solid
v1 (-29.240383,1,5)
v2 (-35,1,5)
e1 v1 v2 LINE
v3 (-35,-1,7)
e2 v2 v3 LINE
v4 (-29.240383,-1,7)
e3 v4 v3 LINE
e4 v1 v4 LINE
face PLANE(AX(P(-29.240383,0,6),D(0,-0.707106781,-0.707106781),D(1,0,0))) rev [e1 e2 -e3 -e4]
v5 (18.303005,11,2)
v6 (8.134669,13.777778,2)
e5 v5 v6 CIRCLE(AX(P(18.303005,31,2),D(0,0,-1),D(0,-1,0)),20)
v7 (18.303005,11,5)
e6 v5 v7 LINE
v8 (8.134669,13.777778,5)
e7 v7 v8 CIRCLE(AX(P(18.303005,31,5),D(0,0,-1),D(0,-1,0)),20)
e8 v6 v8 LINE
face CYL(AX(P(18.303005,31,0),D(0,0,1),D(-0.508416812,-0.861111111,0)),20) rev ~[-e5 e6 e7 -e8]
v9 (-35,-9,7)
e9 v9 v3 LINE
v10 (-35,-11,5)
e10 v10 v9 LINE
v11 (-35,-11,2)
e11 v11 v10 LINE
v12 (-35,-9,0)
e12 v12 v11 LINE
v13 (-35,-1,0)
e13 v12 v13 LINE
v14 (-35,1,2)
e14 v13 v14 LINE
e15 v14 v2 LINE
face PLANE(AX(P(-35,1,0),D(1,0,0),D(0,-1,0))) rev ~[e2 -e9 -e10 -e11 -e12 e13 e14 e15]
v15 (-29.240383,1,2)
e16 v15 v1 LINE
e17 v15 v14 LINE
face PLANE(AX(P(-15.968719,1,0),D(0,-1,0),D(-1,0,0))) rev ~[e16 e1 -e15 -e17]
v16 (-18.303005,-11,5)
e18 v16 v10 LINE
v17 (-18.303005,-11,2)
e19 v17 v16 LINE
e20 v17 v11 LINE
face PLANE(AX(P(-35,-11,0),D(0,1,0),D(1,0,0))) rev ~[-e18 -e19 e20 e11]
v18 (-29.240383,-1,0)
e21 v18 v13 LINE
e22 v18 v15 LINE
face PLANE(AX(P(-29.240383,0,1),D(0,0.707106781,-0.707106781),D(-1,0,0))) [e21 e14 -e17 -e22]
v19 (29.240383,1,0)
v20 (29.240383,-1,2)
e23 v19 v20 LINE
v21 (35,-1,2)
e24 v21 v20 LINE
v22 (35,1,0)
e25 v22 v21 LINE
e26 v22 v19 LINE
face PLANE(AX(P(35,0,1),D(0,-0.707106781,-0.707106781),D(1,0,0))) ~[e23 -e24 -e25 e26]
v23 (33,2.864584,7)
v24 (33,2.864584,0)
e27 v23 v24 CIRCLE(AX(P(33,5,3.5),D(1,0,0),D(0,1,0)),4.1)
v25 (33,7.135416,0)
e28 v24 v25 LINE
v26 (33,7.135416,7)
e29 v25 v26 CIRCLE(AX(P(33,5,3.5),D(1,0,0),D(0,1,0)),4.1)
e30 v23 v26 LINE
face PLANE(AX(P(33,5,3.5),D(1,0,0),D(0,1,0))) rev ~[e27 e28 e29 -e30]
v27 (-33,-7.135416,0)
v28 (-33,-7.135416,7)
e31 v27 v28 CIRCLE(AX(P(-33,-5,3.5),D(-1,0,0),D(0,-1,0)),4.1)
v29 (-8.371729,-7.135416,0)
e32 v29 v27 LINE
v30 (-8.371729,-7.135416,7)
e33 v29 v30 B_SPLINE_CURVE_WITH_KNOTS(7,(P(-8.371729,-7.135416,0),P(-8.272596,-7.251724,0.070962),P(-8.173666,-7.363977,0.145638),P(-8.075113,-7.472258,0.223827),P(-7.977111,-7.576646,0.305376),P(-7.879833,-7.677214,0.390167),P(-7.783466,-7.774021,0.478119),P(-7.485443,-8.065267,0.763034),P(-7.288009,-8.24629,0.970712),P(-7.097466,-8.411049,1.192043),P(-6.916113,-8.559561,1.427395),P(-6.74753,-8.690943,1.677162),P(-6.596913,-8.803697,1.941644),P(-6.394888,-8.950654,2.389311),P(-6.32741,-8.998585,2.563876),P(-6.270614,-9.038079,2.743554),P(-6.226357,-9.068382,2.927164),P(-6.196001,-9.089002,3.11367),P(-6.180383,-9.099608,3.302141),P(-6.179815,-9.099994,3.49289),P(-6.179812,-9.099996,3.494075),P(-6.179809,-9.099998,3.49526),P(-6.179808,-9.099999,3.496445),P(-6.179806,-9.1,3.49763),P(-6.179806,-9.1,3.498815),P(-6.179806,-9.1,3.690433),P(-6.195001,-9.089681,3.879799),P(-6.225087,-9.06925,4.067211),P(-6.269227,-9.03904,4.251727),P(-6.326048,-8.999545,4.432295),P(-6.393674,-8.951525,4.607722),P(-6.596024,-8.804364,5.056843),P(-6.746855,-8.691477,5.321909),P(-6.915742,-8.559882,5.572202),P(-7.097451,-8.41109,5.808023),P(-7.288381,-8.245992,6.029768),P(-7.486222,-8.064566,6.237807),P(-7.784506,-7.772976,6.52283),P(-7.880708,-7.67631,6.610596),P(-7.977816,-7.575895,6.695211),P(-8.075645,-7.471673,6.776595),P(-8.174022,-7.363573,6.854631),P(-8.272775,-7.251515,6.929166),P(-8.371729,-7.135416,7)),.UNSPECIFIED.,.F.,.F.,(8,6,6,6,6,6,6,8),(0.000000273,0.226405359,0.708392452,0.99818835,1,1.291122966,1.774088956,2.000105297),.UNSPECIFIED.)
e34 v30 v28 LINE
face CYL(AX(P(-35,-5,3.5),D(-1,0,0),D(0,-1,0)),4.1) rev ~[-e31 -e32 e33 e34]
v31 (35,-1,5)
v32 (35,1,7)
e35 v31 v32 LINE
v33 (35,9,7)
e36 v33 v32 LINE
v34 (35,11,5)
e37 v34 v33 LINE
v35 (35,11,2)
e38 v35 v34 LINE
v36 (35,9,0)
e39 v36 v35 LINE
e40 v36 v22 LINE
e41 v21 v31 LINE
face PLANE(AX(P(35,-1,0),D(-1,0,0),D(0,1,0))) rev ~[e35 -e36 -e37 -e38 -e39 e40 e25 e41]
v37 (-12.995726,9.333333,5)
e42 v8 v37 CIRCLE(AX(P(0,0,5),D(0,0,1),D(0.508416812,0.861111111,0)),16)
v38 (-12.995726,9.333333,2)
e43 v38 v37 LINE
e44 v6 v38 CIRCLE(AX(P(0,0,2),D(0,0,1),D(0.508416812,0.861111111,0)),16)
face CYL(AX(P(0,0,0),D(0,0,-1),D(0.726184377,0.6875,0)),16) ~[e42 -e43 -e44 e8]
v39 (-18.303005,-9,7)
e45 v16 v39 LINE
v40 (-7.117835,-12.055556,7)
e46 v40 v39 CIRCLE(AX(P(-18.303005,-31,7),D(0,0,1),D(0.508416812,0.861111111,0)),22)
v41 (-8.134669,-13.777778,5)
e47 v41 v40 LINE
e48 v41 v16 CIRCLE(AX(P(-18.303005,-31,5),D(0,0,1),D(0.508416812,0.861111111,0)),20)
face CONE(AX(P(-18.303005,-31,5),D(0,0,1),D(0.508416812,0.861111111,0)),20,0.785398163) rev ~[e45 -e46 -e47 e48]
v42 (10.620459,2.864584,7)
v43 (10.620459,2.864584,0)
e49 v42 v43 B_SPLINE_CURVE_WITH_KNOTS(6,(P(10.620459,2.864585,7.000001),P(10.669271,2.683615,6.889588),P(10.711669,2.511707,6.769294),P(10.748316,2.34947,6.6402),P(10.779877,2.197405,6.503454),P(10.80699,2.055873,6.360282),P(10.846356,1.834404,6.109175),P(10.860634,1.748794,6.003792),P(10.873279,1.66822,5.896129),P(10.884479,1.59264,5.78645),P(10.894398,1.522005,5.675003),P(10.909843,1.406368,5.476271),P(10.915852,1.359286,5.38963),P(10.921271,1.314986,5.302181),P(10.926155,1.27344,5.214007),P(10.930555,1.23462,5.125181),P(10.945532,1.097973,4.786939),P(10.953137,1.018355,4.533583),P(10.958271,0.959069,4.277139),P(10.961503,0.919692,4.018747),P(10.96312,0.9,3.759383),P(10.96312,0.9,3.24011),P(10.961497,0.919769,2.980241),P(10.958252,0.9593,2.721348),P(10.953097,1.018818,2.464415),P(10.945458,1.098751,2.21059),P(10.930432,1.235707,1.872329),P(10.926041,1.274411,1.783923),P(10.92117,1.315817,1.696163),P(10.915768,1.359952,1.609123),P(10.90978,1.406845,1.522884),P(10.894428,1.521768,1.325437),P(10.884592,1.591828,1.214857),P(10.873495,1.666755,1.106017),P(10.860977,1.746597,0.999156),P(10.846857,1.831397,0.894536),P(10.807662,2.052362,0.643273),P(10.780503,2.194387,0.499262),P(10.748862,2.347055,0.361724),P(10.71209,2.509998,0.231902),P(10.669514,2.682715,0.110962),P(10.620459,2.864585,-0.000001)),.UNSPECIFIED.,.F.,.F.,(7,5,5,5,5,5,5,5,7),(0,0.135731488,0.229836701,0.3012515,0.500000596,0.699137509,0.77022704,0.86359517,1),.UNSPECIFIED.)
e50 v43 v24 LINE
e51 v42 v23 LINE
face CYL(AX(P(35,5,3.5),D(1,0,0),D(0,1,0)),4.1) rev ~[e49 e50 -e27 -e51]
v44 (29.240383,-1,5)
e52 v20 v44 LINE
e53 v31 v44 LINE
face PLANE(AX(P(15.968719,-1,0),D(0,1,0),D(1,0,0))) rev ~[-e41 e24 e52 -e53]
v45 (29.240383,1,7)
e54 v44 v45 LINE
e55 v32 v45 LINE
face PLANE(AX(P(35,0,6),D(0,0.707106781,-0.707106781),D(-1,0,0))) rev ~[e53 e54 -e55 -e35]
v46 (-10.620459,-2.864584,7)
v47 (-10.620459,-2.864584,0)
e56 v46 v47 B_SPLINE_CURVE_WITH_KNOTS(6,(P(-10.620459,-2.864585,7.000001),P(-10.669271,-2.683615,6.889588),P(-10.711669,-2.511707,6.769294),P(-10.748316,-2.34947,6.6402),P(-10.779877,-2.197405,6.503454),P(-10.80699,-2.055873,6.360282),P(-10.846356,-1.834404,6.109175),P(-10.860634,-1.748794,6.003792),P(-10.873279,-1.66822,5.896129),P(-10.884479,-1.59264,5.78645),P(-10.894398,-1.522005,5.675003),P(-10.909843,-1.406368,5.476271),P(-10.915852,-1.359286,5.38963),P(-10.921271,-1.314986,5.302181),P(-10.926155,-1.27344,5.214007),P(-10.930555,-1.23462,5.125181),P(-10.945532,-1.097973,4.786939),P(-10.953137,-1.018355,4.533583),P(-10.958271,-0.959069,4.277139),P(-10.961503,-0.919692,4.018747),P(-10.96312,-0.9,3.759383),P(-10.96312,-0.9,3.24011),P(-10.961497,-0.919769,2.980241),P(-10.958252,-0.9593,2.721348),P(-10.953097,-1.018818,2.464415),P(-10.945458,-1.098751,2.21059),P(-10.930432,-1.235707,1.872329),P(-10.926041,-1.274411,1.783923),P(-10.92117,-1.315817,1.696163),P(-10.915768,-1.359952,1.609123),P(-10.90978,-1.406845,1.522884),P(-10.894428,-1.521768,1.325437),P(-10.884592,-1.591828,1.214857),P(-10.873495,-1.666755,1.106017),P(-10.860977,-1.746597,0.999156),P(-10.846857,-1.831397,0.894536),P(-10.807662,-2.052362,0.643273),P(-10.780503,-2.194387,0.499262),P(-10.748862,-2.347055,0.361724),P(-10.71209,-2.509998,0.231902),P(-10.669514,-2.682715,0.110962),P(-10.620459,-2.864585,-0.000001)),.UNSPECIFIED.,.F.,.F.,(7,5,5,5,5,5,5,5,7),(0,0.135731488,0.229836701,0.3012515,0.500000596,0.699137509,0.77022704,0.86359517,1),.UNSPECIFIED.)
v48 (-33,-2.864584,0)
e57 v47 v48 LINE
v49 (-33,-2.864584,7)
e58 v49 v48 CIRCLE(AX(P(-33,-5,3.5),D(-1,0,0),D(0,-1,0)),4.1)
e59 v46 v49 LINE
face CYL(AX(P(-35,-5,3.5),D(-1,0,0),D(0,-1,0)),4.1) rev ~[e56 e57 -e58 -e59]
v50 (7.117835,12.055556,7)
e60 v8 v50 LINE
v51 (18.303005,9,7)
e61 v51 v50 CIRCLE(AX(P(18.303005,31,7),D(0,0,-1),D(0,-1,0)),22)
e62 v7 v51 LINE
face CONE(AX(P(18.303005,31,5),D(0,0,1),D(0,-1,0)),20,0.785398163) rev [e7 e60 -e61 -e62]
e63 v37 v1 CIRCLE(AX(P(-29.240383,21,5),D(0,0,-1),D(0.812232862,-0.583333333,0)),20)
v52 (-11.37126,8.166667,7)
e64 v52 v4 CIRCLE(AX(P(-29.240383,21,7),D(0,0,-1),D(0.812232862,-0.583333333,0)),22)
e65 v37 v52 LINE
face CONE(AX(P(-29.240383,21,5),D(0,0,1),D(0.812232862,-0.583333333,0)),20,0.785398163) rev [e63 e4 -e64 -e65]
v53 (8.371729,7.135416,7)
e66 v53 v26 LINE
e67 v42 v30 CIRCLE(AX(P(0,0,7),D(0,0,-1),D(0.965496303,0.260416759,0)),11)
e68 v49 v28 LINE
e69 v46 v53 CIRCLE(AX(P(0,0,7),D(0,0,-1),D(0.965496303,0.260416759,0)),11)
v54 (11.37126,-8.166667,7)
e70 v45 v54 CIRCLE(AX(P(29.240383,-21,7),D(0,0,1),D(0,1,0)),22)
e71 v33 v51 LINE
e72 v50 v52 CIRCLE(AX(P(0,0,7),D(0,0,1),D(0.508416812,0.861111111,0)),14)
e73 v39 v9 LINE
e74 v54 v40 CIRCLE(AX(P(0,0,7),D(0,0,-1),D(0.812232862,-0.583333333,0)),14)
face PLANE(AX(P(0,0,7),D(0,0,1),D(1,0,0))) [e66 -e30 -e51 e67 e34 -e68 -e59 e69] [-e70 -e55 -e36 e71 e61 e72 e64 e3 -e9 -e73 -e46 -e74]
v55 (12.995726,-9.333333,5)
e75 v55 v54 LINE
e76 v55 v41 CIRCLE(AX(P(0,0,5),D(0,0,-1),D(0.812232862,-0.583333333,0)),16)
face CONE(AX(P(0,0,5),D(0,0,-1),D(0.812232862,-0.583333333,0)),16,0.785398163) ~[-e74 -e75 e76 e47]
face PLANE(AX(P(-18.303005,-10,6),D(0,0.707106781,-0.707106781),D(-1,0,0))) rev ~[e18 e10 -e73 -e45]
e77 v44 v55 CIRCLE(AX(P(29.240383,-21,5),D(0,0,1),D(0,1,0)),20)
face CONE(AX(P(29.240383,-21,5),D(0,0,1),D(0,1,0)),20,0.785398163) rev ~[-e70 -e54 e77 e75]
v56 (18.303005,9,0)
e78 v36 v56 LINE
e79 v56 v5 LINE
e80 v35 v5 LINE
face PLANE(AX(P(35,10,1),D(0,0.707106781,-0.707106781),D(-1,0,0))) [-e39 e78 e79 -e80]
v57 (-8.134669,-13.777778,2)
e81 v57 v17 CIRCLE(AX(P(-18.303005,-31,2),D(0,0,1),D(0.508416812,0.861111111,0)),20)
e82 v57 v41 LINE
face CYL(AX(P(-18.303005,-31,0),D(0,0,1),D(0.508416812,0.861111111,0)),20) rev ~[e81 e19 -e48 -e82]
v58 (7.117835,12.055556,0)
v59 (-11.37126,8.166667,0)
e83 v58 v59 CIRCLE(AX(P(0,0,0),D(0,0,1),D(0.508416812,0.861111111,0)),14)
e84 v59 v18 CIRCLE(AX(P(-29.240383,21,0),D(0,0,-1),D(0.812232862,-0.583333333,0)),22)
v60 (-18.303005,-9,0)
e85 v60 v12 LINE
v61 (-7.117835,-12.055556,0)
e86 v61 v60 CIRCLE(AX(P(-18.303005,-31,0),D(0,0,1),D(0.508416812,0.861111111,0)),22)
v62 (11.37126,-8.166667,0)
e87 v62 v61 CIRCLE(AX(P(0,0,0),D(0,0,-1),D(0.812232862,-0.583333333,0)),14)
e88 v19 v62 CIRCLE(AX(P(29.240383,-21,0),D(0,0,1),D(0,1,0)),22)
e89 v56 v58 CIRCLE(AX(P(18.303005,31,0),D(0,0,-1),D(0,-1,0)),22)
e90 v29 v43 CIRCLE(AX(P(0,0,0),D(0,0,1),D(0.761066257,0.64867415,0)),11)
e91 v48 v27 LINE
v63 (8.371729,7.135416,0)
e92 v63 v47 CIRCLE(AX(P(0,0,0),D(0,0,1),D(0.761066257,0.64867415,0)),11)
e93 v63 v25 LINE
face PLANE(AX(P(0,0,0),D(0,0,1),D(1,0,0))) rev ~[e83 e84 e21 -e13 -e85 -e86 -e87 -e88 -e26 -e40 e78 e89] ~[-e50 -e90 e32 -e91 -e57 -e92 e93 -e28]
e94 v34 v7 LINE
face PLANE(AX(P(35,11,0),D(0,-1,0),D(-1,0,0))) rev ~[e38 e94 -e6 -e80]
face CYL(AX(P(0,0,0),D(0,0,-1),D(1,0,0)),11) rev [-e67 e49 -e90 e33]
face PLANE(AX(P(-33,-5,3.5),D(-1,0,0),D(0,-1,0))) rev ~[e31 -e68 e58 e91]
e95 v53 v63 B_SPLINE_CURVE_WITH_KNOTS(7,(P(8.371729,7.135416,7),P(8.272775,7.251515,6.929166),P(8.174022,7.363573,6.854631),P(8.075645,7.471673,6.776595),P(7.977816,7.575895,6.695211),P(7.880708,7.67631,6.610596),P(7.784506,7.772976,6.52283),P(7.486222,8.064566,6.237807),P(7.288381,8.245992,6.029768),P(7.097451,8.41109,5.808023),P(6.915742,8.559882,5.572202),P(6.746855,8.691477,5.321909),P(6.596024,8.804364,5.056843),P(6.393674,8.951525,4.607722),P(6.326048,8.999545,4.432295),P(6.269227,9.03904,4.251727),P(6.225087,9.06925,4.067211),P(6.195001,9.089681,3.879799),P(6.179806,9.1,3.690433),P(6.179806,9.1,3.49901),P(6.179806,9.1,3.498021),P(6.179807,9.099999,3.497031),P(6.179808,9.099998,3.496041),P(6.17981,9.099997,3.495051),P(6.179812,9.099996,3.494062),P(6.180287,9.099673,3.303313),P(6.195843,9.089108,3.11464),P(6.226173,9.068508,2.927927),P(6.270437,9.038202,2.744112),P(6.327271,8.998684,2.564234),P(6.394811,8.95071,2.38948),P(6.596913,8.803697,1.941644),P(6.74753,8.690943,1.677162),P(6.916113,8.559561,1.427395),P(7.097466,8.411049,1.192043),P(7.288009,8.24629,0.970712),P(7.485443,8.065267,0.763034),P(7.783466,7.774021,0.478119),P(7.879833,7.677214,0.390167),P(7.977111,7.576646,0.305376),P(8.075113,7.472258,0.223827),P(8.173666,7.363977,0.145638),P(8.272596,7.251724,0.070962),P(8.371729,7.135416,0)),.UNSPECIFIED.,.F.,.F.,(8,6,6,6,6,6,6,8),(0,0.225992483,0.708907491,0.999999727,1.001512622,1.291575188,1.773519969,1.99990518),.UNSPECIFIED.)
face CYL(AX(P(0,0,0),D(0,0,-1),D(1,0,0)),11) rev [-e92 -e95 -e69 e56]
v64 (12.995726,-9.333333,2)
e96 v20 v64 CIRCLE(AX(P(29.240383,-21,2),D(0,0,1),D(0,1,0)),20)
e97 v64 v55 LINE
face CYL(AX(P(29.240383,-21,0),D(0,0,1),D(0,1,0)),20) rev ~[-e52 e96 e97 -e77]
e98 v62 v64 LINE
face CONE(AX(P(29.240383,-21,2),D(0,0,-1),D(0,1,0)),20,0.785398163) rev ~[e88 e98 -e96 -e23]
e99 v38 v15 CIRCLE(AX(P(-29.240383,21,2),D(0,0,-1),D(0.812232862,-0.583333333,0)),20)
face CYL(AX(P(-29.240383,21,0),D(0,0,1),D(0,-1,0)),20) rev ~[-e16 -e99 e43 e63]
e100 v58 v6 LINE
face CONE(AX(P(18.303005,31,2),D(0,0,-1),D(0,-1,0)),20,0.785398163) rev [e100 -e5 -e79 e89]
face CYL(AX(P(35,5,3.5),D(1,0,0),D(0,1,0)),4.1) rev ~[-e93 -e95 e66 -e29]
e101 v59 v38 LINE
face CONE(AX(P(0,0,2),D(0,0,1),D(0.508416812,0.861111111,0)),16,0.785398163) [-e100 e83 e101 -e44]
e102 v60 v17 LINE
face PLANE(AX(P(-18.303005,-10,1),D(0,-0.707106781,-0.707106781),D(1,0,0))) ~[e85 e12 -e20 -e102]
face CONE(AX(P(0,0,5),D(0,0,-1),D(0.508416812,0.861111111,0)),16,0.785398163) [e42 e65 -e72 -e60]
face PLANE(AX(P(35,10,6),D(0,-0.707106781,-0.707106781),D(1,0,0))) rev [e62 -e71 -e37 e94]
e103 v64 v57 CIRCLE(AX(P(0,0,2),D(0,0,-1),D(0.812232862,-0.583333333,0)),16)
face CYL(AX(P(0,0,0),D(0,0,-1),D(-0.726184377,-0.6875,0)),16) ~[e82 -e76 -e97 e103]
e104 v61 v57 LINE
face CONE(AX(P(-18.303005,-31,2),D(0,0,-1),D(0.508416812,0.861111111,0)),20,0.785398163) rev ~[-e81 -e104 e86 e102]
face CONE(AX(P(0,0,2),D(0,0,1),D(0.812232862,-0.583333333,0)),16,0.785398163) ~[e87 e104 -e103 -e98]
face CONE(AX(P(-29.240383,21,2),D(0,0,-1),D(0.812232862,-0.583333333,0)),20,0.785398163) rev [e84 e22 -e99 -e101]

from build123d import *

# Parameters (mm, degrees)
F0_R     = 11
F1_DEPTH = 7
F2_R     = 4.1
F3_DEPTH = 28.8211942778
F4_R     = 4.1
F5_DEPTH = 28.8211942778
F6_W     = 12
F6_H     = 7
F7_DEPTH = 2
F8_W     = 12
F8_H     = 7
F9_DEPTH = 2
F10_R    = 20
F11_SIZE = 2


# Not quite as in the source:
# - a feature names something its author has since deleted; it is built from what else it names


with BuildPart() as f1:
    # F0 (on Top) → F1 (new body)
    with BuildSketch(Plane.XY):
        with BuildLine():
            Line((35, 11), (11.6189500386, 11))
            ThreePointArc((11.6189500386, 11), (-5.4525336701, 15.0422696617), (-15.9687194227, 1))
            Line((-15.9687194227, 1), (-35, 1))
            Line((-35, 1), (-35, -11))
            Line((-35, -11), (-11.6189500386, -11))
            ThreePointArc((-11.6189500386, -11), (5.4525336701, -15.0422696617), (15.9687194227, -1))
            Line((15.9687194227, -1), (35, -1))
            Line((35, -1), (35, 11))
        make_face()
        Circle(F0_R, mode=Mode.SUBTRACT)
    extrude(amount=F1_DEPTH)

    # F2 (on face) → F3 (cut, through all)
    with BuildSketch(Plane.YZ.offset(35)):
        with Locations((5, 3.5)):
            Circle(F2_R)
    extrude(amount=-F3_DEPTH, mode=Mode.SUBTRACT)

    # F4 (on face) → F5 (cut, through all)
    with BuildSketch(Plane(origin=(-35, 0, 0), x_dir=(0, -1, 0), z_dir=(-1, 0, 0))):
        with Locations((5, 3.5)):
            Circle(F4_R)
    extrude(amount=-F5_DEPTH, mode=Mode.SUBTRACT)

    # F6 (on face) → F7 (join)
    with BuildSketch(Plane.YZ.offset(35)):
        with Locations((5, 3.5)):
            Rectangle(F6_W, F6_H)
    extrude(amount=-F7_DEPTH)

    # F8 (on face) → F9 (join)
    with BuildSketch(Plane(origin=(-35, 0, 0), x_dir=(0, -1, 0), z_dir=(-1, 0, 0))):
        with Locations((5, 3.5)):
            Rectangle(F8_W, F8_H)
    extrude(amount=-F9_DEPTH)

    # F10
    f10_edges = [f1.edges().sort_by_distance(p)[0] for p in [
        (11.61895, 11, 3.5),
        (-15.968719, 1, 3.5),
        (15.968719, -1, 3.5),
        (-11.61895, -11, 3.5),
    ]]
    fillet(f10_edges, radius=F10_R)

    # F11
    f11_edges = [f1.edges().sort_by_distance(p)[0] for p in [
        (-26.651503, -11, 7),
        (32.120192, -1, 7),
        (-3.293287, 15.657403, 7),
        (-32.120192, 1, 7),
        (32.120192, -1, 0),
        (-3.293287, 15.657403, 0),
        (-26.651503, -11, 0),
        (-32.120192, 1, 0),
    ]]
    chamfer(f11_edges, length=F11_SIZE)


solid = f1.part
